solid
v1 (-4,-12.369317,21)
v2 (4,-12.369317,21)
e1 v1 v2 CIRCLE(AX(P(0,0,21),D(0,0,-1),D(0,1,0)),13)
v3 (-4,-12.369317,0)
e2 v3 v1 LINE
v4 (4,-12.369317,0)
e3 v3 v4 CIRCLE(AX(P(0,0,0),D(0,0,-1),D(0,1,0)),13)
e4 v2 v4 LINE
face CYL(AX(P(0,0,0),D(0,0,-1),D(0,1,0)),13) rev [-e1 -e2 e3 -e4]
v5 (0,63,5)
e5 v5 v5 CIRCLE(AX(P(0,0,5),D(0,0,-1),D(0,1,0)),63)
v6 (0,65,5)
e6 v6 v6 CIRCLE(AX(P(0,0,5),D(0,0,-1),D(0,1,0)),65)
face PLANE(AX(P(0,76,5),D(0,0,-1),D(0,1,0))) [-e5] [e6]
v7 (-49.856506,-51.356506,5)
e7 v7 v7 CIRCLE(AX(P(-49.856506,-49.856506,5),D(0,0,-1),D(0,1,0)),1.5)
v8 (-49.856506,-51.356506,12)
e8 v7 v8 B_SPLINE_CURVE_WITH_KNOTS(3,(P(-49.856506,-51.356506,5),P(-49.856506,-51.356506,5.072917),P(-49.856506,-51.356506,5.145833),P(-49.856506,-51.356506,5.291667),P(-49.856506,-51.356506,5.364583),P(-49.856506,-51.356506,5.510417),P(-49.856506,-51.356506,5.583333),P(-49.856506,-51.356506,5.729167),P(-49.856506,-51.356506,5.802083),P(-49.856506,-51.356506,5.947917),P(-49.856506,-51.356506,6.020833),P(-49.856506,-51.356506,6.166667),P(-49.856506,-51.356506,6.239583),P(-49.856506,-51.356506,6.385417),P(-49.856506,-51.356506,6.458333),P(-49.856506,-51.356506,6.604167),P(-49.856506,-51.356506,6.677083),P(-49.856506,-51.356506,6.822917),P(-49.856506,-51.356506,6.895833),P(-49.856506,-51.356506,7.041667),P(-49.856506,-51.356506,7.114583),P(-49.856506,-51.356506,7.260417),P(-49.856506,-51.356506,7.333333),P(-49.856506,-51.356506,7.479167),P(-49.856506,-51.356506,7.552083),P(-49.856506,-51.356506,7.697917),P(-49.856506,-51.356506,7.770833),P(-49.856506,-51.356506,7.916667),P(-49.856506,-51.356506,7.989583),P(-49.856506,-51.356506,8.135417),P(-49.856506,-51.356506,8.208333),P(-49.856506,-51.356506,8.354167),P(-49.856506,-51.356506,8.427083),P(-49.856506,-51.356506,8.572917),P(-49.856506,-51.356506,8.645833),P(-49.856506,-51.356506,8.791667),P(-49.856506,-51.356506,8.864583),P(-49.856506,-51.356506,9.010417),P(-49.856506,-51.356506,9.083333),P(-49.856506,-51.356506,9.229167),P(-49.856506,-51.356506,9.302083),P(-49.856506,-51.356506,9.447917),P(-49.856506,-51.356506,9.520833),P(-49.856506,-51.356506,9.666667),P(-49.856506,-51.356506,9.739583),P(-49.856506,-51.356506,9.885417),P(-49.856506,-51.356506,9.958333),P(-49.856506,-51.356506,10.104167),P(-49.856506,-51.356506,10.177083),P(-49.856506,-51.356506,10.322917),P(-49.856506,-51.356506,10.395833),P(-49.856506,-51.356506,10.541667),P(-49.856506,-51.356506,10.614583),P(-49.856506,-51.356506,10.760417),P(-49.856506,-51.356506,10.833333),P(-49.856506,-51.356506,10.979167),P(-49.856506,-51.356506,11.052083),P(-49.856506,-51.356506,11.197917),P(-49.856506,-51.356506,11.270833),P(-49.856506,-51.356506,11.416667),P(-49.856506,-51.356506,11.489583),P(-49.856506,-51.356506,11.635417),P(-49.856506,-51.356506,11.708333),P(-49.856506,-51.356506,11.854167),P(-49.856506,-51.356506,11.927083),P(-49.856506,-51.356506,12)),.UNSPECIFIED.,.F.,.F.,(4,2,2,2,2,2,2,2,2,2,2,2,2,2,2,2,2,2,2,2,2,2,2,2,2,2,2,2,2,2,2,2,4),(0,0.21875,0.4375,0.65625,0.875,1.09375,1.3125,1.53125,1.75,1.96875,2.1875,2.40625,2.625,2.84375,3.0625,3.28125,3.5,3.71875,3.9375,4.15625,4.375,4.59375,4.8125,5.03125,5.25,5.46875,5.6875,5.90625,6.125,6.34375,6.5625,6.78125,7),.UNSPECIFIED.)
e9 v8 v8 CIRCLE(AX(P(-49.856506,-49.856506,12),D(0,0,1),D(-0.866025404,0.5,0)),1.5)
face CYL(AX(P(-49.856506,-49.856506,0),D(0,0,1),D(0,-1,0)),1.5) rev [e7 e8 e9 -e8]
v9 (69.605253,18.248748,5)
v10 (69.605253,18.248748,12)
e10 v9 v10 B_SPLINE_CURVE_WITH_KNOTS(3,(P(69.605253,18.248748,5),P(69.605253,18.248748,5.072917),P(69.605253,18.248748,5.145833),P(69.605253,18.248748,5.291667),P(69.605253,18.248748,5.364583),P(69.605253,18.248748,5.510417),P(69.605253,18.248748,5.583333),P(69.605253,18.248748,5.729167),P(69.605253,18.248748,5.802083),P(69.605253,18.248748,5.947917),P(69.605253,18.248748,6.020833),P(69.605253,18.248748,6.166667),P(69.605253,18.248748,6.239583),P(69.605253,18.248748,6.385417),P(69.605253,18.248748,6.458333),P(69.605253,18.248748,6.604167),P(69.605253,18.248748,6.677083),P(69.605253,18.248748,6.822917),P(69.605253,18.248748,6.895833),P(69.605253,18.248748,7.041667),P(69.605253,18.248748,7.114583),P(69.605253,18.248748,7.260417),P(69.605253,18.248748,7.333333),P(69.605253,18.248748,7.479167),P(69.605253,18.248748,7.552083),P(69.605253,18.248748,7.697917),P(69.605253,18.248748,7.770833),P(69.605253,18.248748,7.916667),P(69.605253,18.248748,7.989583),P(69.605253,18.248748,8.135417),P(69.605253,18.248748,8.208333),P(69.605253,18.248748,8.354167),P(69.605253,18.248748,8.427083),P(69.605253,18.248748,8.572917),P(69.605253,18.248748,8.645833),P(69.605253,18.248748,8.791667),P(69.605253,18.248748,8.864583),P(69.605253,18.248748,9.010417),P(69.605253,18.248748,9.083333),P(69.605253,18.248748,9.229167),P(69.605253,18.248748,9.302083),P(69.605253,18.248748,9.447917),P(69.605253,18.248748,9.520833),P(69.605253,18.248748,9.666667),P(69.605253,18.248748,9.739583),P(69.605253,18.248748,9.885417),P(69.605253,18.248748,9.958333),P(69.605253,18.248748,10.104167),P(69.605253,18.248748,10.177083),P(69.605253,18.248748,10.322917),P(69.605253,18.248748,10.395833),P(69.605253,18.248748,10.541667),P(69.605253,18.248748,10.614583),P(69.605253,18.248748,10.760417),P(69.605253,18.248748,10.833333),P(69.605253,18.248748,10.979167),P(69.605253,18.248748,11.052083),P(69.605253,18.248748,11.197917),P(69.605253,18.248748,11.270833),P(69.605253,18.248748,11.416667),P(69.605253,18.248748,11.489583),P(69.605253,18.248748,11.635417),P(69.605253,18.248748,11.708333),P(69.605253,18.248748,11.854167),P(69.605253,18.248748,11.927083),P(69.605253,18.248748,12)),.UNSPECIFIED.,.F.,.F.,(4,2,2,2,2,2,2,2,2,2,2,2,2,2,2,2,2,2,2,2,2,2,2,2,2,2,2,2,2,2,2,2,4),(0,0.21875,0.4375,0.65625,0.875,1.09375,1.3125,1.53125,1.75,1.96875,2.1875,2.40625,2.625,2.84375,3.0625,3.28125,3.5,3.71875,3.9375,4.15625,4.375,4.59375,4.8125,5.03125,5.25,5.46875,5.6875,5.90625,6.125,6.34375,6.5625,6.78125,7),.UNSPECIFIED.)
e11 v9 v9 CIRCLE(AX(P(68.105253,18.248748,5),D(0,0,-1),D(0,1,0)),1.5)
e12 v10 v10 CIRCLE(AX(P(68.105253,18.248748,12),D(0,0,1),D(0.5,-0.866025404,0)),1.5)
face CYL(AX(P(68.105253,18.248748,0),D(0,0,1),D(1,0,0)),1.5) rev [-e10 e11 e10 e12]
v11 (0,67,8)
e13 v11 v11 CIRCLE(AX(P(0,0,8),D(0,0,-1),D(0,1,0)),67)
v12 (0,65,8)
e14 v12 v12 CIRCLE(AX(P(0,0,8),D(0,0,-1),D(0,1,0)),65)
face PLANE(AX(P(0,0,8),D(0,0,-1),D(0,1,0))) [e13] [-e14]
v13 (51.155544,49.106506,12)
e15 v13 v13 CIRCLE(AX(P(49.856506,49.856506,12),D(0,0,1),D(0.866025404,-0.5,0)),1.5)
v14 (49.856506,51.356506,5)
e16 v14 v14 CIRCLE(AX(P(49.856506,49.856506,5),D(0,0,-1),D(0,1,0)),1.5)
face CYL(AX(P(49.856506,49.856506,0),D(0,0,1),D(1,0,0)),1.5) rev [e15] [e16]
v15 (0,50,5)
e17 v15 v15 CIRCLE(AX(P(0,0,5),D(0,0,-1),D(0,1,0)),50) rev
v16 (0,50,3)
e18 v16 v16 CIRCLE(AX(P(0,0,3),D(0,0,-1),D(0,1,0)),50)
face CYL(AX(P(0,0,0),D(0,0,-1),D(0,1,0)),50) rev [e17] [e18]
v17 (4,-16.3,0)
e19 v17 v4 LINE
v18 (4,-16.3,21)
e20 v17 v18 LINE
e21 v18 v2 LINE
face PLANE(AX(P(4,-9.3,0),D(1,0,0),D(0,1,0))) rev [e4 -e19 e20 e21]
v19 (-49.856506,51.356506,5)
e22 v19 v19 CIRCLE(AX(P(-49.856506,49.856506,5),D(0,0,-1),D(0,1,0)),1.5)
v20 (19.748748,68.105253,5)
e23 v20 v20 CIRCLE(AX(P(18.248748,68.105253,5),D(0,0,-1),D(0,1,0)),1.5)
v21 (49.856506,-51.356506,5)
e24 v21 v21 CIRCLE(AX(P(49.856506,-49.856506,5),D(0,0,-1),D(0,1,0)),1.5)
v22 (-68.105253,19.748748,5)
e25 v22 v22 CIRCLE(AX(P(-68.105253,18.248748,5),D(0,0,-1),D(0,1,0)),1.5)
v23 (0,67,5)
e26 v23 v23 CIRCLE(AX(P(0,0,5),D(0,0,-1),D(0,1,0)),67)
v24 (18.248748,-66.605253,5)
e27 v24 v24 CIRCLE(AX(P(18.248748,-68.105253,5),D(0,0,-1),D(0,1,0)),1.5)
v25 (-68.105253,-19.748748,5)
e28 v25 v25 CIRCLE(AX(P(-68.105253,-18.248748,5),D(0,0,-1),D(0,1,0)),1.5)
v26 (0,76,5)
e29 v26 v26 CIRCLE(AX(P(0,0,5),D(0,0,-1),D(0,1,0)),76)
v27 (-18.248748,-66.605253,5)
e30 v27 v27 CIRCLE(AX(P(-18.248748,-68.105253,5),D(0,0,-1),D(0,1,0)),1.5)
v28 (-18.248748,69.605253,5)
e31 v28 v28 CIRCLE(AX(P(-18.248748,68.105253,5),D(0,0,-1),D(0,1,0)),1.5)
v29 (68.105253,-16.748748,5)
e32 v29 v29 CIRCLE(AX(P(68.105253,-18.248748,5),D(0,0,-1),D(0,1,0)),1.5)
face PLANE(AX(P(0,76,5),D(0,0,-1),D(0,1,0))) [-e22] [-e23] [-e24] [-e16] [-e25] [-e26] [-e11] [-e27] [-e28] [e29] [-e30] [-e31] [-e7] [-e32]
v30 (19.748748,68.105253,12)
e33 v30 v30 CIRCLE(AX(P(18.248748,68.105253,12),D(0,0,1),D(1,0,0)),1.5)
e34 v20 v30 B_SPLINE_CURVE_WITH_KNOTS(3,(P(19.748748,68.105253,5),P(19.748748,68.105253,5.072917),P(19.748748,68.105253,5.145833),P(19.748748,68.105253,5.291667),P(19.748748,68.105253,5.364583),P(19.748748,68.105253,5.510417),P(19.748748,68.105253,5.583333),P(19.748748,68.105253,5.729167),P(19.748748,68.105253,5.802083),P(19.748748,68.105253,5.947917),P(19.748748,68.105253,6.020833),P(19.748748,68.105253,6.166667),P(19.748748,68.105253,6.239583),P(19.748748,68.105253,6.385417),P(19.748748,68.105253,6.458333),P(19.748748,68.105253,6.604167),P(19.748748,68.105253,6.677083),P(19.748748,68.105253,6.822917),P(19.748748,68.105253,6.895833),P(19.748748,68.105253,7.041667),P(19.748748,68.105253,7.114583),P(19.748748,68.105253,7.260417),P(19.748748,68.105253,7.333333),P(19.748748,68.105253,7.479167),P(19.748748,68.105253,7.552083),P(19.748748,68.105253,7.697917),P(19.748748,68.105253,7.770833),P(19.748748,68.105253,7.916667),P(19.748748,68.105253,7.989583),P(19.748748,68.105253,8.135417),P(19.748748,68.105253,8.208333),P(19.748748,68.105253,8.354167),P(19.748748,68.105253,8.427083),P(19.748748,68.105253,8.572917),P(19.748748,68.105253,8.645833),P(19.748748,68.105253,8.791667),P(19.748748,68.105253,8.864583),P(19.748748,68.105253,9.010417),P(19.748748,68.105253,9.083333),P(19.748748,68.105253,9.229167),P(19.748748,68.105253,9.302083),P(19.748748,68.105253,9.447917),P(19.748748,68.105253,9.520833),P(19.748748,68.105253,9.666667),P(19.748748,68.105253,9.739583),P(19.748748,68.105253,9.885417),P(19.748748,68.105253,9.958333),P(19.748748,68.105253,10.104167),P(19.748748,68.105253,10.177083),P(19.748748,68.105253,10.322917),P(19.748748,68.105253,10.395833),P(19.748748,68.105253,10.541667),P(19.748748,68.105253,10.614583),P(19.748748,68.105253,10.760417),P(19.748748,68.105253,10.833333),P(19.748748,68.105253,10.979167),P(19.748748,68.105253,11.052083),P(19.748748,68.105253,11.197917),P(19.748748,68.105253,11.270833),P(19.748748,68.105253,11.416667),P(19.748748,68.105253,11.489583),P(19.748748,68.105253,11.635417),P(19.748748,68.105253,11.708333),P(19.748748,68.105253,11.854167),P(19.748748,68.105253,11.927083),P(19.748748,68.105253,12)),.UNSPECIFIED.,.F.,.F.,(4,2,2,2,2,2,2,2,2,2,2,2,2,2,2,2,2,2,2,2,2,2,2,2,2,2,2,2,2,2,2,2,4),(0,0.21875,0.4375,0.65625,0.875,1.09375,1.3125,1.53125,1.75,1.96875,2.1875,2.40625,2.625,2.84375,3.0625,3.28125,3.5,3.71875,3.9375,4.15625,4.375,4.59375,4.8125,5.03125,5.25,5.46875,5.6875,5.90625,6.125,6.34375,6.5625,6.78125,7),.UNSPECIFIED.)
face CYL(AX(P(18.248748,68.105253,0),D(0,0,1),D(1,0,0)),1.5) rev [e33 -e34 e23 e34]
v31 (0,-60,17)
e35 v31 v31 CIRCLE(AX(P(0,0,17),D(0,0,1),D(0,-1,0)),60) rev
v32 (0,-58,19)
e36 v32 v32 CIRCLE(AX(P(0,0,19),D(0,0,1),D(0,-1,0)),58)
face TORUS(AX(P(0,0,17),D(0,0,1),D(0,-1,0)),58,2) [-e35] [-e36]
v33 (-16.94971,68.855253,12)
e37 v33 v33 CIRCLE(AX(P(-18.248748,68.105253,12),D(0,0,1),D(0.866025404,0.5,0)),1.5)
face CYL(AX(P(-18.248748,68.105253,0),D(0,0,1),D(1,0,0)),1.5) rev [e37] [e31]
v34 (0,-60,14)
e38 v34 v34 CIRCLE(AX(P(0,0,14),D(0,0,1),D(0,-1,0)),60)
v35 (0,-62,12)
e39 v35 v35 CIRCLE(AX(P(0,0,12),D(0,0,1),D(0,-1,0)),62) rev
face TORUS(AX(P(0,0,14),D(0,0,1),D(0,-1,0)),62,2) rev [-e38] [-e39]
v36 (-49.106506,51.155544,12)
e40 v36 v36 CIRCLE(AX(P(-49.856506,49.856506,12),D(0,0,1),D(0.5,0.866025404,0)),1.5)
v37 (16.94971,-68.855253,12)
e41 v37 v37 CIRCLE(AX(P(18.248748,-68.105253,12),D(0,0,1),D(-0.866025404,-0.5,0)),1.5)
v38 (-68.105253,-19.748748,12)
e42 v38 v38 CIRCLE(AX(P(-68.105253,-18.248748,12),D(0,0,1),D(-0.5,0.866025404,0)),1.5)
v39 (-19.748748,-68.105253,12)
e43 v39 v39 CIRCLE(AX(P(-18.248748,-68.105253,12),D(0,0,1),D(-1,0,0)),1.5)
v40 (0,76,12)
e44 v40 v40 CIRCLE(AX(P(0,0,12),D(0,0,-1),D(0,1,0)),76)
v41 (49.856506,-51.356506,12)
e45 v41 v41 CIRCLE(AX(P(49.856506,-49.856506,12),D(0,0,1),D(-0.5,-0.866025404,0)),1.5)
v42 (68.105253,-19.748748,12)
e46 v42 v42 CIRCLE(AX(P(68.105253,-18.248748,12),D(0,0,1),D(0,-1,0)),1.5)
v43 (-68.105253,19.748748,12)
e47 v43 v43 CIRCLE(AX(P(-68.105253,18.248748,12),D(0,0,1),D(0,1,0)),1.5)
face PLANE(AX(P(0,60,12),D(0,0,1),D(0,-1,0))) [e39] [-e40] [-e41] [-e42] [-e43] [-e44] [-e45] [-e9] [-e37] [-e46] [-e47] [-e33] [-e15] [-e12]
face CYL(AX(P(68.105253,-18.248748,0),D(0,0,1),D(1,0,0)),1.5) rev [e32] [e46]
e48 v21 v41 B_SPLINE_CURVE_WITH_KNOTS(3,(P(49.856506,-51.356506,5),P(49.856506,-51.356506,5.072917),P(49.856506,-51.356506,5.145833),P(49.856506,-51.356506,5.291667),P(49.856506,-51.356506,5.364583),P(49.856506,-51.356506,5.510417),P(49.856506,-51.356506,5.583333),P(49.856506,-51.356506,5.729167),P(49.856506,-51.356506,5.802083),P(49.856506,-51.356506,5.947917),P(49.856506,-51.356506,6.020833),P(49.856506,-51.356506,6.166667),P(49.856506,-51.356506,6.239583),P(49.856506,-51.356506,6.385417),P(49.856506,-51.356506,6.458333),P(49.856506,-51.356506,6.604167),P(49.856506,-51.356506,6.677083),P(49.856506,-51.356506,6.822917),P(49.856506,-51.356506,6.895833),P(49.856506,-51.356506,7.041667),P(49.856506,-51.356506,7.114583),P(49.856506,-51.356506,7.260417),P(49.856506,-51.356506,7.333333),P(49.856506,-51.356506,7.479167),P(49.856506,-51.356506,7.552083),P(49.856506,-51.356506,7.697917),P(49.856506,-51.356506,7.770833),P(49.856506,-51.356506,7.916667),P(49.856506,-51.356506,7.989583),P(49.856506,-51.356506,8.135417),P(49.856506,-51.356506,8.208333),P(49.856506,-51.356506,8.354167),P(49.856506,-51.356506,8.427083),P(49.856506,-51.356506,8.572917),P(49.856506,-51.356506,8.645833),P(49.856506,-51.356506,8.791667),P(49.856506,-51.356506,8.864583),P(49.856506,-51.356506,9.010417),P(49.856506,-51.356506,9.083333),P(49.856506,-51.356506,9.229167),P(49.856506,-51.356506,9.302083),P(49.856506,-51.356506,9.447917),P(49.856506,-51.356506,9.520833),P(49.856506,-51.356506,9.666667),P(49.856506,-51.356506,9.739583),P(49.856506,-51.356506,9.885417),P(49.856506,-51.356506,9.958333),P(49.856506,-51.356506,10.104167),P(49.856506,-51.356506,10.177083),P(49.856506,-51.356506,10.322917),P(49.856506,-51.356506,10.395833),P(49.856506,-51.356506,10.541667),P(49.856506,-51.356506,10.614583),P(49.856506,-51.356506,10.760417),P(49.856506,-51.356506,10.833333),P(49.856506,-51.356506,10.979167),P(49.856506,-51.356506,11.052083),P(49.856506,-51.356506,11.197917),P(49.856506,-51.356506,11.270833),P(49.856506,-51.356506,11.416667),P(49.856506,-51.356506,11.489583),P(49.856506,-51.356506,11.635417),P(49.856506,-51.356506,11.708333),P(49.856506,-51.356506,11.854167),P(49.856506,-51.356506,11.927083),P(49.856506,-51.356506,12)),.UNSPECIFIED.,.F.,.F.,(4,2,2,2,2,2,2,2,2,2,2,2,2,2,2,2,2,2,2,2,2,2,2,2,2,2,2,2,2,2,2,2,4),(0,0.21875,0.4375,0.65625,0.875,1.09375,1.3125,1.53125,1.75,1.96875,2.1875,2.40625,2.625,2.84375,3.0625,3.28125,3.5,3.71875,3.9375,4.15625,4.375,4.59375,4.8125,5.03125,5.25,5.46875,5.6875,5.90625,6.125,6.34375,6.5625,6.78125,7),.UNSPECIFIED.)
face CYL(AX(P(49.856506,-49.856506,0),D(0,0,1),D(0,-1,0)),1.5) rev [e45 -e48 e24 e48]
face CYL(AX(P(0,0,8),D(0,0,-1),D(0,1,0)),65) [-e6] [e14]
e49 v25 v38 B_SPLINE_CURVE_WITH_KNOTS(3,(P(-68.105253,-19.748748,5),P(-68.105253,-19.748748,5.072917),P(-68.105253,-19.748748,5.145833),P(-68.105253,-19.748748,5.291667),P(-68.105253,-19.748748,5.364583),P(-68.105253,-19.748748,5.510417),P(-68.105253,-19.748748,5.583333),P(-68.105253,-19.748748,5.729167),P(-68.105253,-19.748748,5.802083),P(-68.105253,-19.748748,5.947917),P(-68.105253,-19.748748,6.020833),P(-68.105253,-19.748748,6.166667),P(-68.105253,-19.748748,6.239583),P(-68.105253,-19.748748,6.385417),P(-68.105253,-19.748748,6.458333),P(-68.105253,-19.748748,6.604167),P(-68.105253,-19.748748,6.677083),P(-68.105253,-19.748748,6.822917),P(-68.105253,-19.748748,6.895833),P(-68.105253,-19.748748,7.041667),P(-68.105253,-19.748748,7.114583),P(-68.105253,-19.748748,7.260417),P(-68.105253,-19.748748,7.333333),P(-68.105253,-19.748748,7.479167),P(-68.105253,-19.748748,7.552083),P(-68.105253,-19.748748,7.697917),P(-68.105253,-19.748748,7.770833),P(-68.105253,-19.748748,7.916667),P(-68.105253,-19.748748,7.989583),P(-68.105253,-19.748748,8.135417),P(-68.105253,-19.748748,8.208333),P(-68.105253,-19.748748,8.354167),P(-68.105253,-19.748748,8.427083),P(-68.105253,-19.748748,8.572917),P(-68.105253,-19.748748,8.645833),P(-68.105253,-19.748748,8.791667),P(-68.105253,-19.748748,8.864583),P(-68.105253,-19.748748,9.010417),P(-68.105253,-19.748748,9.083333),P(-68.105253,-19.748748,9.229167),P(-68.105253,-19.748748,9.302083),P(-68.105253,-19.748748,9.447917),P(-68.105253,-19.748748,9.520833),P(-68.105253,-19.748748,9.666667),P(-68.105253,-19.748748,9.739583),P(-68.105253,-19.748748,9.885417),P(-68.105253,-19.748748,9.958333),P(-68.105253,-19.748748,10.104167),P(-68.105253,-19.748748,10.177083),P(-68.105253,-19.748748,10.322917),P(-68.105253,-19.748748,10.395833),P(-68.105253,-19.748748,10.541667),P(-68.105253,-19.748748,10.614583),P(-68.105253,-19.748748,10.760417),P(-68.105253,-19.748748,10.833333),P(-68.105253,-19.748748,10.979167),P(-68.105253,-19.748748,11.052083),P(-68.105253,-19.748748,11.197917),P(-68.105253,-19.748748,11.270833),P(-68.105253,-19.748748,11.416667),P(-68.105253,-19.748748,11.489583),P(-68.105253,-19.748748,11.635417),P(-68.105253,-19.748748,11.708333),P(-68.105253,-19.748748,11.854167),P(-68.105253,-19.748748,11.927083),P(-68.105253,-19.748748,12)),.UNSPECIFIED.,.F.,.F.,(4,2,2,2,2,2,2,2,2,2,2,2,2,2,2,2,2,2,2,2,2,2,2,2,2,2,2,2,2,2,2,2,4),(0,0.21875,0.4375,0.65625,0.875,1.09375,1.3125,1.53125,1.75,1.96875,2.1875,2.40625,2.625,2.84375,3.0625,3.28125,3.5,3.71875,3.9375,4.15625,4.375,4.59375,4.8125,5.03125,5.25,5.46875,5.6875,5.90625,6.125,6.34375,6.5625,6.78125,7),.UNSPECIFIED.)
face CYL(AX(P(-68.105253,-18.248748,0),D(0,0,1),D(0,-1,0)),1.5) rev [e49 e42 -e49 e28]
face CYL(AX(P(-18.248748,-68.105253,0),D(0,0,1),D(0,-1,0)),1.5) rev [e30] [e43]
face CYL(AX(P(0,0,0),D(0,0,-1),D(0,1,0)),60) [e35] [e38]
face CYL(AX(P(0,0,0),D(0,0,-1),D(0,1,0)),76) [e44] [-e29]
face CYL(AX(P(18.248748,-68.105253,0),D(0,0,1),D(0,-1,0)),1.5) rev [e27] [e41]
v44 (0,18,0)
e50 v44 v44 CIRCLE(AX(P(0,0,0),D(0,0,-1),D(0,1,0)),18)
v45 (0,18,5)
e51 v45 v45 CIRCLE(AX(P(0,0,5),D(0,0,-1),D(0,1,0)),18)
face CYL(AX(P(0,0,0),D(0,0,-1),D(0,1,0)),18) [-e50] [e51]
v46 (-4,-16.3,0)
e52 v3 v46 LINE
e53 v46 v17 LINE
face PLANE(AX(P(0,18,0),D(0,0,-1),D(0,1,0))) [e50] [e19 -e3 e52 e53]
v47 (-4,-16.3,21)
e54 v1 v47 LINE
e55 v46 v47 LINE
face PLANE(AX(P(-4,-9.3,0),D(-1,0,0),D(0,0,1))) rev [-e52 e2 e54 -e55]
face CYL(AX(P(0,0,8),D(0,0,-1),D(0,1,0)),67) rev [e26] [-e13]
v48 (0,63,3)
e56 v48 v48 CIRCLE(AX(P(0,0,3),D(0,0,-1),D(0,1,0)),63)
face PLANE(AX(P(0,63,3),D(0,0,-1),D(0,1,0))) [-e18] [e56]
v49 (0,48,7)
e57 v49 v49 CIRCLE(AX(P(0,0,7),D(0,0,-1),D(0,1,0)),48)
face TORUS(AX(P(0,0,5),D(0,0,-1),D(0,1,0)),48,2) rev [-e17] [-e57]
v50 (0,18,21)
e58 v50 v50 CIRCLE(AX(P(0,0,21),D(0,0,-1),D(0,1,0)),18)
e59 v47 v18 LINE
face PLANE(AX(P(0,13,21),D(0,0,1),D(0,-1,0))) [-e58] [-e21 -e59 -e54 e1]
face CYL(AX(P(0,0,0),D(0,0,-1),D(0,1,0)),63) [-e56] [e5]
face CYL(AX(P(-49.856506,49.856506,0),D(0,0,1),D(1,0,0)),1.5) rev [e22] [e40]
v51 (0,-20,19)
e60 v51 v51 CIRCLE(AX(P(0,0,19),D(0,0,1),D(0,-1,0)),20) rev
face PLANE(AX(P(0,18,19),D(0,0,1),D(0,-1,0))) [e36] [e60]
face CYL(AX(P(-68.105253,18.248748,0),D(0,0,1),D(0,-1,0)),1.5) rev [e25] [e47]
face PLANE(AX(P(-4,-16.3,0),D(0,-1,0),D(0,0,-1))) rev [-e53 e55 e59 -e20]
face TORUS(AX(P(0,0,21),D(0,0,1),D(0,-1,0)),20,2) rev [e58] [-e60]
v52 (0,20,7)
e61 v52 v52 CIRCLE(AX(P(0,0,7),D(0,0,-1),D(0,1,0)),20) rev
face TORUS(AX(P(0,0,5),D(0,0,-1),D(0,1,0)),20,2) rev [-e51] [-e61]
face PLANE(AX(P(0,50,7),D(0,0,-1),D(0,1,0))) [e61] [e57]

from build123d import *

# Parameters (mm, degrees)
FILLET1_R          = 2
SKETCH3_R          = 67
SKETCH3_R_2        = 65
CUT_EXTRUDE1_DEPTH = 3
SKETCH4_R          = 1.5
CUT_EXTRUDE3_DEPTH = 109.148046677
CIRPATTERN1_COUNT  = 12
SKETCH5_W          = 8
SKETCH5_H          = 7
CUT_EXTRUDE4_DEPTH = 110.512556358


with BuildPart() as part:
    # Sketch1 → Revolve1 (revolve)
    with BuildSketch(Plane(origin=(0, 0, 0), x_dir=(0, 0, -1), z_dir=(1, 0, 0))):
        Polygon((0, 13), (-21, 13), (-21, 18), (-19, 18), (-19, 60), (-12, 60), (-12, 76), (-5, 76), (-5, 63), (-3, 63), (-3, 50), (-7, 50), (-7, 18), (0, 18), align=None)
    revolve(axis=Axis((0, 0, 0), (0, 0, 1)))

    # Fillet1
    fillet1_edges = [part.edges().sort_by_distance(p)[0] for p in [
        (0, -50, 7),
        (0, -60, 12),
        (0, -60, 19),
        (0, -18, 19),
        (0, -18, 7),
    ]]
    fillet(fillet1_edges, radius=FILLET1_R - 0.0001)  # a hair under: the kernel refuses the full size

    # Sketch3 → Cut-Extrude1 (cut)
    with BuildSketch(Plane(origin=(0, 0, 5), x_dir=(-1, 0, 0), z_dir=(0, 0, -1))):
        with Locations(Location((0, 0, 0), (0, 0, 90))):
            Circle(SKETCH3_R)
        with Locations(Location((0, 0, 0), (0, 0, 90))):
            Circle(SKETCH3_R_2, mode=Mode.SUBTRACT)
    extrude(amount=-CUT_EXTRUDE1_DEPTH, mode=Mode.SUBTRACT)

    # Sketch4 → Cut-Extrude3 (cut, through all)
    with BuildSketch(Plane.XY.offset(12)):
        with Locations((18.24874767, 68.105253479)):
            Circle(SKETCH4_R)
    cut_extrude3 = extrude(amount=-CUT_EXTRUDE3_DEPTH, mode=Mode.SUBTRACT)

    # CirPattern1: Cut-Extrude3 ×12 about axis
    cirpattern1_axis = Axis((0, 0, 0), (0, 0, 1))
    for i in range(1, CIRPATTERN1_COUNT):
        add(cut_extrude3.rotate(cirpattern1_axis, i * 360 / CIRPATTERN1_COUNT), mode=Mode.SUBTRACT)

    # Sketch5 → Cut-Extrude4 (cut, through all)
    with BuildSketch(Plane.XY.offset(21)):
        with Locations((0, -12.8)):
            Rectangle(SKETCH5_W, SKETCH5_H)
    extrude(amount=-CUT_EXTRUDE4_DEPTH, mode=Mode.SUBTRACT)


solid = part.part
